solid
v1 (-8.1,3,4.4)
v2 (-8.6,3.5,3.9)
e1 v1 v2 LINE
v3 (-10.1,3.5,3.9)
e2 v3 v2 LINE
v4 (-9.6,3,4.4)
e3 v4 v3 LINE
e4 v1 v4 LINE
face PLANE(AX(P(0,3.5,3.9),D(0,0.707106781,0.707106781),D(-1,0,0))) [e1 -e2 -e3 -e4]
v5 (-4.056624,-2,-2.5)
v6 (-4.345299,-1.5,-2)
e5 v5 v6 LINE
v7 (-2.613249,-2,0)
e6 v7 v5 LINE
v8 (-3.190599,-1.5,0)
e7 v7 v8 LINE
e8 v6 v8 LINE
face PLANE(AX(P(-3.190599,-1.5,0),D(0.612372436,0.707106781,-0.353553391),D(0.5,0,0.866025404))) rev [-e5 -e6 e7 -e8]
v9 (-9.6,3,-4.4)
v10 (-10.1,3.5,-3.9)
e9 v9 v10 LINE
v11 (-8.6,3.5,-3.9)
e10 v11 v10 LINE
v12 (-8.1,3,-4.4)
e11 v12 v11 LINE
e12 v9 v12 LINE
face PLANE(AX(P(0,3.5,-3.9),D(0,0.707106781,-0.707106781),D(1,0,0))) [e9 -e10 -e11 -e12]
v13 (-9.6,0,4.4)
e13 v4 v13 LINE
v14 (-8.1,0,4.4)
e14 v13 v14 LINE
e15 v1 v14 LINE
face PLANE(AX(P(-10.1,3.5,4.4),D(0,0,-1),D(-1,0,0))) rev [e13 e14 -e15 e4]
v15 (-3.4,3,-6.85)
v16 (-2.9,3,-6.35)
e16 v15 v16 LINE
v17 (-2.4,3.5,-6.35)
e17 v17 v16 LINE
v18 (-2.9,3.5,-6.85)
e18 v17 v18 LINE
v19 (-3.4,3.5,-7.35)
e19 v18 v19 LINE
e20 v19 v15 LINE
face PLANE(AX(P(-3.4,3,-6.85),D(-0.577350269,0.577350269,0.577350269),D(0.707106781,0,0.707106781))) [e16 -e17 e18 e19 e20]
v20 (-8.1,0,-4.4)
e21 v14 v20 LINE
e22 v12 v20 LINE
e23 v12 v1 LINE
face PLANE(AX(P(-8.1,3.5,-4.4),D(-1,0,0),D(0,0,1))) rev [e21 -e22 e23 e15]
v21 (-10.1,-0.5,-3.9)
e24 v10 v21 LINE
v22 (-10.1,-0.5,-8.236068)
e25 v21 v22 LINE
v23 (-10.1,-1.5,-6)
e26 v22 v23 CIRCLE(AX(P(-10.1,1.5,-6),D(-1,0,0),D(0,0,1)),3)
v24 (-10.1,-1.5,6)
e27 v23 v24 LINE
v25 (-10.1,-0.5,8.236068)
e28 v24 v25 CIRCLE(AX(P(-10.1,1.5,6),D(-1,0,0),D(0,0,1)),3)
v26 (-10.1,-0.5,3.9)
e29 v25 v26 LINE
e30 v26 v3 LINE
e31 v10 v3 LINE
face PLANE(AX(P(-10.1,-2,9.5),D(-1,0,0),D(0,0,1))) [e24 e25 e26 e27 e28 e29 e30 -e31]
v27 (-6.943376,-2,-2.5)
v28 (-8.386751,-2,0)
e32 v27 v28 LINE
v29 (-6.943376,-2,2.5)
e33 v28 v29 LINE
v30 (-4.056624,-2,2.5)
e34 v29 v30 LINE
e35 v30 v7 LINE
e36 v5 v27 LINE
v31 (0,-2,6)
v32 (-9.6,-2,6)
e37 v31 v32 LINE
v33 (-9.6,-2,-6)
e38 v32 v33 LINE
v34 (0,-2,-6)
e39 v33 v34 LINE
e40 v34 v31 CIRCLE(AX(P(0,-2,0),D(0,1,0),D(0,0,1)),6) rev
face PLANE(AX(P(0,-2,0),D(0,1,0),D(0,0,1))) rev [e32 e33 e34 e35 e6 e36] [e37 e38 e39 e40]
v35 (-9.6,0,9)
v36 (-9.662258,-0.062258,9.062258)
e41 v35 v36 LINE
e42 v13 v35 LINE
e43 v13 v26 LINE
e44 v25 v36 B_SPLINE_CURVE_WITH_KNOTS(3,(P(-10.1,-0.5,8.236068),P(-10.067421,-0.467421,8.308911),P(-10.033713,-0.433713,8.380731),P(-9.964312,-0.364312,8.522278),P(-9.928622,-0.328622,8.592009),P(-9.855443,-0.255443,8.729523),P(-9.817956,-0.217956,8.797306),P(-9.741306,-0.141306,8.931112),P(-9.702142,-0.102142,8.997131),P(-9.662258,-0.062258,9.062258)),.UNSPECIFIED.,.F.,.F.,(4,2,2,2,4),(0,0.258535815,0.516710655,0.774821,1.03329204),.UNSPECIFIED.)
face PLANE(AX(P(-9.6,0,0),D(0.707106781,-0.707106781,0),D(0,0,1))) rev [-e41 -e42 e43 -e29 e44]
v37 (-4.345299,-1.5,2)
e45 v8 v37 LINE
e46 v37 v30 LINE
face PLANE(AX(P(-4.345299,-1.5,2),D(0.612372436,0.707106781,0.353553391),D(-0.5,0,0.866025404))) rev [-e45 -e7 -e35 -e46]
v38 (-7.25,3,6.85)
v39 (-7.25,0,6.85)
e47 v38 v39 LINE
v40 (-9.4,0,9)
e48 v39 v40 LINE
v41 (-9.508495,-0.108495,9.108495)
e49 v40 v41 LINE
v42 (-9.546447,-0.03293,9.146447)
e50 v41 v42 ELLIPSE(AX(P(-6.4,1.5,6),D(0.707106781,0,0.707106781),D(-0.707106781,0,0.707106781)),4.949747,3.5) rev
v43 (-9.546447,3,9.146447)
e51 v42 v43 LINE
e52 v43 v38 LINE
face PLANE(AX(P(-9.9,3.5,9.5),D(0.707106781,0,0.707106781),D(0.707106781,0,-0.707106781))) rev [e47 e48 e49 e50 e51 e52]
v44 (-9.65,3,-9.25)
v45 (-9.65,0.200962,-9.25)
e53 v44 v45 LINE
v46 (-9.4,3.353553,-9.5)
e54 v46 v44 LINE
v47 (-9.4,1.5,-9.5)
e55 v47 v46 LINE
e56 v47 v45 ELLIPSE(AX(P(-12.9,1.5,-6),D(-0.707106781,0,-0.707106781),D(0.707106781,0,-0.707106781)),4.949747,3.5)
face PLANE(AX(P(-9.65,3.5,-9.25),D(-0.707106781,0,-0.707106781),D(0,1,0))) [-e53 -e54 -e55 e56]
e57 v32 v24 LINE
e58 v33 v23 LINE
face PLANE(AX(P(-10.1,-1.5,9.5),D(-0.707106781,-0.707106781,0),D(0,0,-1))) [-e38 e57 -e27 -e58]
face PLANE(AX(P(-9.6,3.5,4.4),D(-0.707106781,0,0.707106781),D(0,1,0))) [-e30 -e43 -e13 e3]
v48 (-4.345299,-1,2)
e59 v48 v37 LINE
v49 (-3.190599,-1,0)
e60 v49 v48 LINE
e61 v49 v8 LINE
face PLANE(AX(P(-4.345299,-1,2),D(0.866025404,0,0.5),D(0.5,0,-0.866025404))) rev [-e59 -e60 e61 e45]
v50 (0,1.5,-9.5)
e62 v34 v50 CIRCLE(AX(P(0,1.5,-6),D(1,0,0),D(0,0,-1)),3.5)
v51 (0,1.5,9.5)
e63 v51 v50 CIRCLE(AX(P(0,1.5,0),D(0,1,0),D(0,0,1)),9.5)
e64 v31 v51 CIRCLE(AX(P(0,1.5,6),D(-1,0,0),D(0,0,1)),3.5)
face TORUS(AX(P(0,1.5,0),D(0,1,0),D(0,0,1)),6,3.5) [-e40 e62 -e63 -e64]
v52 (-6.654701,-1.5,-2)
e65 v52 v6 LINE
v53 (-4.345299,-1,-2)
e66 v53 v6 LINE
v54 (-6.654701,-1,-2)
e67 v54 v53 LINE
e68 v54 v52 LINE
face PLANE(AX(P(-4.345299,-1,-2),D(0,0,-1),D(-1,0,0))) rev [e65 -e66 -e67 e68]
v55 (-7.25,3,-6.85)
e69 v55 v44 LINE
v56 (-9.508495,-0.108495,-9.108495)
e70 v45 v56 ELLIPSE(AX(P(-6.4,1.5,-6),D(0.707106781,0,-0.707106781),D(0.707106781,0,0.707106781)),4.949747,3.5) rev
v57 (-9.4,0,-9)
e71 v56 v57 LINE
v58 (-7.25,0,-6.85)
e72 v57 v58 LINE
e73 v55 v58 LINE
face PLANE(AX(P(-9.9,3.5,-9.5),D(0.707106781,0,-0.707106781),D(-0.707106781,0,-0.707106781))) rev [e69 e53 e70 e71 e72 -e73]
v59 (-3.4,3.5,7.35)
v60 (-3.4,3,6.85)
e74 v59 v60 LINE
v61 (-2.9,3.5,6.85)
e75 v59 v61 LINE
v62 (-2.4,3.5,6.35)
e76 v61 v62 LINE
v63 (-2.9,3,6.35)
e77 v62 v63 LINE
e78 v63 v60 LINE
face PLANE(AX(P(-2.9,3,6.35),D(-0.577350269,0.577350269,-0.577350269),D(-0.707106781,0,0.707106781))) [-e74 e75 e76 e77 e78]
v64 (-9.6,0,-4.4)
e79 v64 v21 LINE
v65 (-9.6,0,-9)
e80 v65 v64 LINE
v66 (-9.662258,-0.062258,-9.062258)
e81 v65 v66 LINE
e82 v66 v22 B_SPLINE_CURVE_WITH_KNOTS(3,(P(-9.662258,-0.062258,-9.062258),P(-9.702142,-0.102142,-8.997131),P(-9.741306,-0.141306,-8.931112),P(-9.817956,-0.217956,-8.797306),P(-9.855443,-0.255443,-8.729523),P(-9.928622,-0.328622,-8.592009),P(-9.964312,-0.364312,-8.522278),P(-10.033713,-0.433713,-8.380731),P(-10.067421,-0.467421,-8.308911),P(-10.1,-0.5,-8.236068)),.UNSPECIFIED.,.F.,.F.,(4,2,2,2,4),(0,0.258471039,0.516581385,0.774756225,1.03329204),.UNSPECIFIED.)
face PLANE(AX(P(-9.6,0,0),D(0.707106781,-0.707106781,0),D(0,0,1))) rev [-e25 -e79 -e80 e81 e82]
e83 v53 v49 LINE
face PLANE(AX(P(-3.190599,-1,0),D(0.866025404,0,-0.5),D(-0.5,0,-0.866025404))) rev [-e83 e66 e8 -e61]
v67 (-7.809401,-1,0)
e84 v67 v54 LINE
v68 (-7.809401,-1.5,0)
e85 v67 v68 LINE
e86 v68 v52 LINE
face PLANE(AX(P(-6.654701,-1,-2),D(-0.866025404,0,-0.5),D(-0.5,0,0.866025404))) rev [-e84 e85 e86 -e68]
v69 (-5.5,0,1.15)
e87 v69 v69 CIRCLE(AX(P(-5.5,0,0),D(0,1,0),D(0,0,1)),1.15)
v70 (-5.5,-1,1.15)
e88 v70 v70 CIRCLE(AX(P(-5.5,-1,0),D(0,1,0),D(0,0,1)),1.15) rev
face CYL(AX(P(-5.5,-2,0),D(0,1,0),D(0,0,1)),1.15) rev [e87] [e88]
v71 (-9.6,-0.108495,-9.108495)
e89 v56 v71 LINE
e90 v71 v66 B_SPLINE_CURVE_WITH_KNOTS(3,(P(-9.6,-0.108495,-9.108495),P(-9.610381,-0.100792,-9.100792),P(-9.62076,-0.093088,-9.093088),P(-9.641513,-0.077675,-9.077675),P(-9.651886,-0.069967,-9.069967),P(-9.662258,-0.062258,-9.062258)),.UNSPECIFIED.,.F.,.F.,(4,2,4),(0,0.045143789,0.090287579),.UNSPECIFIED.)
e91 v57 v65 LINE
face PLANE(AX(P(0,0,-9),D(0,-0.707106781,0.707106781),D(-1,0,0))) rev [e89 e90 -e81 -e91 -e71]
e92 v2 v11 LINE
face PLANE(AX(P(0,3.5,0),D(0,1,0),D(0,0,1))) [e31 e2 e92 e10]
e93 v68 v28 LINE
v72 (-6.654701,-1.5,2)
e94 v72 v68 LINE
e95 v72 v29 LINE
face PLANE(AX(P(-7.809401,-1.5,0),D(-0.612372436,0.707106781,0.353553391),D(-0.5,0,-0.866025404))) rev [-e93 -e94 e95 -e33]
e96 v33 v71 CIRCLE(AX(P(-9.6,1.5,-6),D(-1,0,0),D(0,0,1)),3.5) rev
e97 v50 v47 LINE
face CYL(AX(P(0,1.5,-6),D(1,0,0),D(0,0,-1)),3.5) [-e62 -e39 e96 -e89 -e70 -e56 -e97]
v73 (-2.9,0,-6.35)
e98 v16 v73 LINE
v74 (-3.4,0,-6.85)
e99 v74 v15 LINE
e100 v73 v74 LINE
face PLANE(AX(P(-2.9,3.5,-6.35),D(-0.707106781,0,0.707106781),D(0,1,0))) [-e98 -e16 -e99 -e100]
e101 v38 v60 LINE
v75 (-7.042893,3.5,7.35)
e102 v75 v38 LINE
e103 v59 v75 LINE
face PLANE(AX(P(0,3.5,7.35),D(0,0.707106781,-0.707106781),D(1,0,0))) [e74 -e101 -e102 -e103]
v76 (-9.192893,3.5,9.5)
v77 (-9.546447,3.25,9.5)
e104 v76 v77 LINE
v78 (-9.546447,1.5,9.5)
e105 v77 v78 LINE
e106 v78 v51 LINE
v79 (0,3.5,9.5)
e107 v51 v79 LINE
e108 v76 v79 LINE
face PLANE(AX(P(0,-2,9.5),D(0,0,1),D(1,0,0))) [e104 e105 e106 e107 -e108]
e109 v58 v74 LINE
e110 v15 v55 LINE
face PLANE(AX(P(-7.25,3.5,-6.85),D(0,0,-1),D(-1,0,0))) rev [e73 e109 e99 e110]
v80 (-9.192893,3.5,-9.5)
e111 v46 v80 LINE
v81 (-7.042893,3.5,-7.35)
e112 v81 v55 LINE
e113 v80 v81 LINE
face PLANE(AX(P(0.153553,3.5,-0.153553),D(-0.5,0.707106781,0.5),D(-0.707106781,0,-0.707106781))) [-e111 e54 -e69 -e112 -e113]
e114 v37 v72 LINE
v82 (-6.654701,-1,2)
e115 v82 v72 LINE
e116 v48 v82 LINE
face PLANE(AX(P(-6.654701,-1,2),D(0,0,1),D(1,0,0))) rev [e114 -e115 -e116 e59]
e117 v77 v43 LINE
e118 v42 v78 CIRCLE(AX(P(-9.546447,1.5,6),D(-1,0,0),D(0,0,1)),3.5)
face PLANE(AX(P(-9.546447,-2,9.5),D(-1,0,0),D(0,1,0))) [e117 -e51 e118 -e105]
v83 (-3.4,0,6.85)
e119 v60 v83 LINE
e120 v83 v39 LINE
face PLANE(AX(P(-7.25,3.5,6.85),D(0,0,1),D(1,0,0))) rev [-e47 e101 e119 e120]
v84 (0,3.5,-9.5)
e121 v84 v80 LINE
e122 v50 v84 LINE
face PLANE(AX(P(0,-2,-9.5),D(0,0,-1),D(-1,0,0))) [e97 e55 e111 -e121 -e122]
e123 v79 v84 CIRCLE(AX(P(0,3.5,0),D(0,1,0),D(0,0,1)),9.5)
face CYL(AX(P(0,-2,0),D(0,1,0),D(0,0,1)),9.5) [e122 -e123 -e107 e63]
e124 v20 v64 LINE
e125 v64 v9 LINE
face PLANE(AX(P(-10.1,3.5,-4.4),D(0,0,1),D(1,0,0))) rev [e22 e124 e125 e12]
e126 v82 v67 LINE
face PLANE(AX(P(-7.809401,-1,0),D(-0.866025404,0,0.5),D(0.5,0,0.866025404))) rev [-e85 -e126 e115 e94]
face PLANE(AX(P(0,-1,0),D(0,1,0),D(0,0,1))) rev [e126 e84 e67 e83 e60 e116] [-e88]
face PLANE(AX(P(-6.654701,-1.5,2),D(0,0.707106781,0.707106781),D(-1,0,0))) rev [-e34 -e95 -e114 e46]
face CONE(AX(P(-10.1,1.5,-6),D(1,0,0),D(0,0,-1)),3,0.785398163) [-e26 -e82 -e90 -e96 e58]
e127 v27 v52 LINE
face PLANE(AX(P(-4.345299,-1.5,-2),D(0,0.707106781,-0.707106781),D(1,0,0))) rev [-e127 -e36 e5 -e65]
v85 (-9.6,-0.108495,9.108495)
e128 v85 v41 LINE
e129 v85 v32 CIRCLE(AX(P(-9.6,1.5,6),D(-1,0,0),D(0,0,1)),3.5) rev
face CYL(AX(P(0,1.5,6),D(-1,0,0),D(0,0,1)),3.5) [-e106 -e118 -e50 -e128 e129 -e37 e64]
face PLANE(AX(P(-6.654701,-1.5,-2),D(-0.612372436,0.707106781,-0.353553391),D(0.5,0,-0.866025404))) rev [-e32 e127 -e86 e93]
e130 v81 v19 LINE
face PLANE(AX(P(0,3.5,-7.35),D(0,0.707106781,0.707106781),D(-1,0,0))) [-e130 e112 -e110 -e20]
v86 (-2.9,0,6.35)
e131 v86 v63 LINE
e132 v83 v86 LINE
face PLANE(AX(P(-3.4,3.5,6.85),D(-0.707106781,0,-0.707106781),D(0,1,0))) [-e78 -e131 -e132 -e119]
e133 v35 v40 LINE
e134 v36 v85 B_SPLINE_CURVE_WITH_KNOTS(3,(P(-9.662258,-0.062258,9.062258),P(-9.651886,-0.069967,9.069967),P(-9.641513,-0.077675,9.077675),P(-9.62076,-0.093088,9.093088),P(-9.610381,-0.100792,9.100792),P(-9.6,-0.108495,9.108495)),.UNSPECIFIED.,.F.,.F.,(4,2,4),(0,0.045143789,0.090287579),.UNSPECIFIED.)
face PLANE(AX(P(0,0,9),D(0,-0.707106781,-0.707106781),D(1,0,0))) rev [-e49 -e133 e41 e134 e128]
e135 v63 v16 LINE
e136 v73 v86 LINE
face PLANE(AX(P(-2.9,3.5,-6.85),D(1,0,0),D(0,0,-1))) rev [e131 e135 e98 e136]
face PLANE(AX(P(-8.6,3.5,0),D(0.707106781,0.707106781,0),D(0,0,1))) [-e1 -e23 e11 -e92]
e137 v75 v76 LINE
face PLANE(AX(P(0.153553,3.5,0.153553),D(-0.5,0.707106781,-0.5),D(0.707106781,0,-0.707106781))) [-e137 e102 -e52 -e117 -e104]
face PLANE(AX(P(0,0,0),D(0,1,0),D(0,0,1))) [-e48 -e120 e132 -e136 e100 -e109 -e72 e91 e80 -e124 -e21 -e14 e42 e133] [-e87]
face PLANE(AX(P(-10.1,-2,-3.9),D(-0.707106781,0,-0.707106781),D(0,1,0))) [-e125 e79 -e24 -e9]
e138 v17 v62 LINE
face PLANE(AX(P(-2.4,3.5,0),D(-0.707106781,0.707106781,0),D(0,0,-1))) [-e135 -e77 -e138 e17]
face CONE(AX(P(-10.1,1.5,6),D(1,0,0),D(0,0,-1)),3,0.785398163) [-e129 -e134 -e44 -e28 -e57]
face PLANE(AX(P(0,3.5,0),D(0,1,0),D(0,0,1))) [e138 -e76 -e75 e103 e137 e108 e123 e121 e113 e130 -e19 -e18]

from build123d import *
from OCP.BRepFilletAPI import BRepFilletAPI_MakeChamfer

# Parameters (mm, degrees)
BOSS_EXTRUDE1_DEPTH     = 2
BOSS_EXTRUDE2_START     = 3.5
BOSS_EXTRUDE2_DEPTH     = 3.5
CUT_EXTRUDE1_DEPTH      = 15.300699284
CUT_EXTRUDE1_DEPTH_BACK = 15.300699284
SKETCH4_R               = 1.15
CUT_EXTRUDE2_DEPTH      = 1
CHAMFER1_SIZE           = 0.5
CHAMFER1_SIZE2          = 0.353553391
FILLET1_R               = 3.5
CHAMFER2_SIZE           = 0.5


with BuildPart() as part:
    # Sketch1 → Boss-Extrude1 (new body)
    with BuildSketch(Plane(origin=(0, 0, 0), x_dir=(1, 0, 0), z_dir=(0, 1, 0))):
        with BuildLine():
            Line((-10.1, -4.5), (-10.1, 4.5))
            Line((-10.1, 4.5), (-10.1, 9.5))
            Line((-10.1, 9.5), (0, 9.5))
            ThreePointArc((0, 9.5), (9.5, 0), (0, -9.5))
            Line((0, -9.5), (-10.1, -9.5))
            Line((-10.1, -9.5), (-10.1, -4.5))
        make_face()
    extrude(amount=-BOSS_EXTRUDE1_DEPTH)

    # Sketch2 → Boss-Extrude2 (add)
    with BuildSketch(Plane(origin=(0, 0, 0), x_dir=(1, 0, 0), z_dir=(0, 1, 0)).offset(BOSS_EXTRUDE2_START)):
        Polygon((-10.1, 4.4), (-8.1, 4.4), (-8.1, -4.4), (-10.1, -4.4), (-10.1, 0), align=None)
        with BuildLine():
            Line((-9.9, 9.5), (-7.25, 6.85))
            Line((-7.25, 6.85), (-2.9, 6.85))
            Line((-2.9, 6.85), (-2.9, -6.85))
            Line((-2.9, -6.85), (-7.25, -6.85))
            Line((-7.25, -6.85), (-9.9, -9.5))
            Line((-9.9, -9.5), (0, -9.5))
            ThreePointArc((0, -9.5), (9.5, 0), (0, 9.5))
            Line((0, 9.5), (-9.9, 9.5))
        make_face()
    extrude(amount=-BOSS_EXTRUDE2_DEPTH)

    # Sketch4 → Cut-Extrude1 (cut, two sides: drawn at the far end of the back side and taken through both)
    with BuildSketch(Plane(origin=(0, 0, 0), x_dir=(1, 0, 0), z_dir=(0, 1, 0)).offset(-CUT_EXTRUDE1_DEPTH_BACK)):
        with Locations(Location((-5.5, 0, 0), (0, 0, 270))):
            Circle(SKETCH4_R)
    extrude(amount=CUT_EXTRUDE1_DEPTH + CUT_EXTRUDE1_DEPTH_BACK, mode=Mode.SUBTRACT)

    # Sketch14 → Cut-Extrude2 (cut)
    with BuildSketch(Plane.XZ.offset(2)):
        Polygon((-6.654700538, 2), (-4.345299462, 2), (-3.190598923, 0), (-4.345299462, -2), (-6.654700538, -2), (-7.809401077, 0), align=None)
    extrude(amount=-CUT_EXTRUDE2_DEPTH, mode=Mode.SUBTRACT)

    # Chamfer1: one chamfer whose edges measure the first distance from different faces: ONE call of the kernel's chamfer builder (chamfer() names one face for all edges)
    chamfer1_edges_1 = [part.edges().sort_by_distance(p)[0] for p in [
        (-10.1, 0, 6.95),
        (-10.1, 1.75, -4.4),
        (-10.1, 1.75, 4.4),
        (-9.1, 3.5, 4.4),
        (-8.1, 3.5, 0),
        (-9.1, 3.5, -4.4),
        (-10, 0, -9.5),
        (-2.9, 1.75, -6.85),
        (-2.9, 1.75, 6.85),
        (-8.575, 3.5, -8.175),
        (-5.075, 3.5, -6.85),
        (-2.9, 3.5, 0),
        (-5.075, 3.5, 6.85),
        (-8.575, 3.5, 8.175),
        (-7.232050808, -2, 1),
        (-7.232050808, -2, -1),
        (-5.5, -2, -2),
        (-3.767949192, -2, -1),
        (-3.767949192, -2, 1),
        (-5.5, -2, 2),
        (-10, 0, 9.5),
        (-10.1, 0, -6.95),
    ]]
    chamfer1_edges_2 = [part.edges().sort_by_distance(p)[0] for p in [
        (-9.9, 1.75, -9.5),
    ]]
    chamfer1_side_2 = [part.faces().sort_by_distance(p)[0] for p in [
        (-4.986827712, 0.737237922, -9.5),
    ]]
    chamfer1_edges_3 = [part.edges().sort_by_distance(p)[0] for p in [
        (-9.9, 1.75, 9.5),
    ]]
    chamfer1_side_3 = [part.faces().sort_by_distance(p)[0] for p in [
        (-8.575, 1.75, 8.175),
    ]]
    chamfer1 = BRepFilletAPI_MakeChamfer(part.part.solid().wrapped)
    for e in chamfer1_edges_1:
        chamfer1.Add(CHAMFER1_SIZE, e.wrapped)
    for e in chamfer1_edges_2:
        chamfer1.Add(CHAMFER1_SIZE, CHAMFER1_SIZE2, e.wrapped, chamfer1_side_2[0].wrapped)  # the first distance lies on this face
    for e in chamfer1_edges_3:
        chamfer1.Add(CHAMFER1_SIZE, CHAMFER1_SIZE2, e.wrapped, chamfer1_side_3[0].wrapped)  # the first distance lies on this face
    add(Compound.cast(chamfer1.Shape()), mode=Mode.REPLACE)

    # Fillet1
    # the kernel refuses this fillet: 3.5 mm, written as the material it takes off along each edge
    with BuildSketch(Plane(origin=(0, -2, 9.5), x_dir=(0, 1, 0), z_dir=(-1, 0, 0))) as fillet1_piece_1:
        with BuildLine():
            CenterArc((FILLET1_R, FILLET1_R), FILLET1_R, 180, 90)
            Line((0, FILLET1_R), (0, 0))
            Line((0, 0), (FILLET1_R, 0))
        make_face()
    extrude(amount=18.85, mode=Mode.SUBTRACT)
    with BuildSketch(Plane(origin=(-18.85, -2, -9.5), x_dir=(0, 0, 1), z_dir=(1, 0, 0))) as fillet1_piece_2:
        with BuildLine():
            CenterArc((FILLET1_R, -FILLET1_R), FILLET1_R, 90, 90)
            Line((0, -FILLET1_R), (0, 0))
            Line((0, 0), (FILLET1_R, 0))
        make_face()
    extrude(amount=18.85, mode=Mode.SUBTRACT)
    with BuildSketch(Plane(origin=(0, -2, 0), x_dir=(0, 0, -1), z_dir=(-1, 0, 0))) as fillet1_piece_3:
        with BuildLine():
            CenterArc((9.5 - FILLET1_R, -FILLET1_R), FILLET1_R, 0, 90)
            Line((9.5, -FILLET1_R), (9.5, 0))
            Line((9.5, 0), (9.5 - FILLET1_R, 0))
        make_face()
    revolve(axis=Axis((0, -2, 0), (0, -1, 0)), revolution_arc=180, mode=Mode.SUBTRACT)

    # Chamfer2
    chamfer2_edges = [part.edges().sort_by_distance(p)[0] for p in [
        (-10.1, -1.602418411, -7.620185175),
        (-10.1, -1.602418411, 7.620185175),
        (-10.1, -2, 0),
    ]]
    chamfer(chamfer2_edges, length=CHAMFER2_SIZE)


solid = part.part
